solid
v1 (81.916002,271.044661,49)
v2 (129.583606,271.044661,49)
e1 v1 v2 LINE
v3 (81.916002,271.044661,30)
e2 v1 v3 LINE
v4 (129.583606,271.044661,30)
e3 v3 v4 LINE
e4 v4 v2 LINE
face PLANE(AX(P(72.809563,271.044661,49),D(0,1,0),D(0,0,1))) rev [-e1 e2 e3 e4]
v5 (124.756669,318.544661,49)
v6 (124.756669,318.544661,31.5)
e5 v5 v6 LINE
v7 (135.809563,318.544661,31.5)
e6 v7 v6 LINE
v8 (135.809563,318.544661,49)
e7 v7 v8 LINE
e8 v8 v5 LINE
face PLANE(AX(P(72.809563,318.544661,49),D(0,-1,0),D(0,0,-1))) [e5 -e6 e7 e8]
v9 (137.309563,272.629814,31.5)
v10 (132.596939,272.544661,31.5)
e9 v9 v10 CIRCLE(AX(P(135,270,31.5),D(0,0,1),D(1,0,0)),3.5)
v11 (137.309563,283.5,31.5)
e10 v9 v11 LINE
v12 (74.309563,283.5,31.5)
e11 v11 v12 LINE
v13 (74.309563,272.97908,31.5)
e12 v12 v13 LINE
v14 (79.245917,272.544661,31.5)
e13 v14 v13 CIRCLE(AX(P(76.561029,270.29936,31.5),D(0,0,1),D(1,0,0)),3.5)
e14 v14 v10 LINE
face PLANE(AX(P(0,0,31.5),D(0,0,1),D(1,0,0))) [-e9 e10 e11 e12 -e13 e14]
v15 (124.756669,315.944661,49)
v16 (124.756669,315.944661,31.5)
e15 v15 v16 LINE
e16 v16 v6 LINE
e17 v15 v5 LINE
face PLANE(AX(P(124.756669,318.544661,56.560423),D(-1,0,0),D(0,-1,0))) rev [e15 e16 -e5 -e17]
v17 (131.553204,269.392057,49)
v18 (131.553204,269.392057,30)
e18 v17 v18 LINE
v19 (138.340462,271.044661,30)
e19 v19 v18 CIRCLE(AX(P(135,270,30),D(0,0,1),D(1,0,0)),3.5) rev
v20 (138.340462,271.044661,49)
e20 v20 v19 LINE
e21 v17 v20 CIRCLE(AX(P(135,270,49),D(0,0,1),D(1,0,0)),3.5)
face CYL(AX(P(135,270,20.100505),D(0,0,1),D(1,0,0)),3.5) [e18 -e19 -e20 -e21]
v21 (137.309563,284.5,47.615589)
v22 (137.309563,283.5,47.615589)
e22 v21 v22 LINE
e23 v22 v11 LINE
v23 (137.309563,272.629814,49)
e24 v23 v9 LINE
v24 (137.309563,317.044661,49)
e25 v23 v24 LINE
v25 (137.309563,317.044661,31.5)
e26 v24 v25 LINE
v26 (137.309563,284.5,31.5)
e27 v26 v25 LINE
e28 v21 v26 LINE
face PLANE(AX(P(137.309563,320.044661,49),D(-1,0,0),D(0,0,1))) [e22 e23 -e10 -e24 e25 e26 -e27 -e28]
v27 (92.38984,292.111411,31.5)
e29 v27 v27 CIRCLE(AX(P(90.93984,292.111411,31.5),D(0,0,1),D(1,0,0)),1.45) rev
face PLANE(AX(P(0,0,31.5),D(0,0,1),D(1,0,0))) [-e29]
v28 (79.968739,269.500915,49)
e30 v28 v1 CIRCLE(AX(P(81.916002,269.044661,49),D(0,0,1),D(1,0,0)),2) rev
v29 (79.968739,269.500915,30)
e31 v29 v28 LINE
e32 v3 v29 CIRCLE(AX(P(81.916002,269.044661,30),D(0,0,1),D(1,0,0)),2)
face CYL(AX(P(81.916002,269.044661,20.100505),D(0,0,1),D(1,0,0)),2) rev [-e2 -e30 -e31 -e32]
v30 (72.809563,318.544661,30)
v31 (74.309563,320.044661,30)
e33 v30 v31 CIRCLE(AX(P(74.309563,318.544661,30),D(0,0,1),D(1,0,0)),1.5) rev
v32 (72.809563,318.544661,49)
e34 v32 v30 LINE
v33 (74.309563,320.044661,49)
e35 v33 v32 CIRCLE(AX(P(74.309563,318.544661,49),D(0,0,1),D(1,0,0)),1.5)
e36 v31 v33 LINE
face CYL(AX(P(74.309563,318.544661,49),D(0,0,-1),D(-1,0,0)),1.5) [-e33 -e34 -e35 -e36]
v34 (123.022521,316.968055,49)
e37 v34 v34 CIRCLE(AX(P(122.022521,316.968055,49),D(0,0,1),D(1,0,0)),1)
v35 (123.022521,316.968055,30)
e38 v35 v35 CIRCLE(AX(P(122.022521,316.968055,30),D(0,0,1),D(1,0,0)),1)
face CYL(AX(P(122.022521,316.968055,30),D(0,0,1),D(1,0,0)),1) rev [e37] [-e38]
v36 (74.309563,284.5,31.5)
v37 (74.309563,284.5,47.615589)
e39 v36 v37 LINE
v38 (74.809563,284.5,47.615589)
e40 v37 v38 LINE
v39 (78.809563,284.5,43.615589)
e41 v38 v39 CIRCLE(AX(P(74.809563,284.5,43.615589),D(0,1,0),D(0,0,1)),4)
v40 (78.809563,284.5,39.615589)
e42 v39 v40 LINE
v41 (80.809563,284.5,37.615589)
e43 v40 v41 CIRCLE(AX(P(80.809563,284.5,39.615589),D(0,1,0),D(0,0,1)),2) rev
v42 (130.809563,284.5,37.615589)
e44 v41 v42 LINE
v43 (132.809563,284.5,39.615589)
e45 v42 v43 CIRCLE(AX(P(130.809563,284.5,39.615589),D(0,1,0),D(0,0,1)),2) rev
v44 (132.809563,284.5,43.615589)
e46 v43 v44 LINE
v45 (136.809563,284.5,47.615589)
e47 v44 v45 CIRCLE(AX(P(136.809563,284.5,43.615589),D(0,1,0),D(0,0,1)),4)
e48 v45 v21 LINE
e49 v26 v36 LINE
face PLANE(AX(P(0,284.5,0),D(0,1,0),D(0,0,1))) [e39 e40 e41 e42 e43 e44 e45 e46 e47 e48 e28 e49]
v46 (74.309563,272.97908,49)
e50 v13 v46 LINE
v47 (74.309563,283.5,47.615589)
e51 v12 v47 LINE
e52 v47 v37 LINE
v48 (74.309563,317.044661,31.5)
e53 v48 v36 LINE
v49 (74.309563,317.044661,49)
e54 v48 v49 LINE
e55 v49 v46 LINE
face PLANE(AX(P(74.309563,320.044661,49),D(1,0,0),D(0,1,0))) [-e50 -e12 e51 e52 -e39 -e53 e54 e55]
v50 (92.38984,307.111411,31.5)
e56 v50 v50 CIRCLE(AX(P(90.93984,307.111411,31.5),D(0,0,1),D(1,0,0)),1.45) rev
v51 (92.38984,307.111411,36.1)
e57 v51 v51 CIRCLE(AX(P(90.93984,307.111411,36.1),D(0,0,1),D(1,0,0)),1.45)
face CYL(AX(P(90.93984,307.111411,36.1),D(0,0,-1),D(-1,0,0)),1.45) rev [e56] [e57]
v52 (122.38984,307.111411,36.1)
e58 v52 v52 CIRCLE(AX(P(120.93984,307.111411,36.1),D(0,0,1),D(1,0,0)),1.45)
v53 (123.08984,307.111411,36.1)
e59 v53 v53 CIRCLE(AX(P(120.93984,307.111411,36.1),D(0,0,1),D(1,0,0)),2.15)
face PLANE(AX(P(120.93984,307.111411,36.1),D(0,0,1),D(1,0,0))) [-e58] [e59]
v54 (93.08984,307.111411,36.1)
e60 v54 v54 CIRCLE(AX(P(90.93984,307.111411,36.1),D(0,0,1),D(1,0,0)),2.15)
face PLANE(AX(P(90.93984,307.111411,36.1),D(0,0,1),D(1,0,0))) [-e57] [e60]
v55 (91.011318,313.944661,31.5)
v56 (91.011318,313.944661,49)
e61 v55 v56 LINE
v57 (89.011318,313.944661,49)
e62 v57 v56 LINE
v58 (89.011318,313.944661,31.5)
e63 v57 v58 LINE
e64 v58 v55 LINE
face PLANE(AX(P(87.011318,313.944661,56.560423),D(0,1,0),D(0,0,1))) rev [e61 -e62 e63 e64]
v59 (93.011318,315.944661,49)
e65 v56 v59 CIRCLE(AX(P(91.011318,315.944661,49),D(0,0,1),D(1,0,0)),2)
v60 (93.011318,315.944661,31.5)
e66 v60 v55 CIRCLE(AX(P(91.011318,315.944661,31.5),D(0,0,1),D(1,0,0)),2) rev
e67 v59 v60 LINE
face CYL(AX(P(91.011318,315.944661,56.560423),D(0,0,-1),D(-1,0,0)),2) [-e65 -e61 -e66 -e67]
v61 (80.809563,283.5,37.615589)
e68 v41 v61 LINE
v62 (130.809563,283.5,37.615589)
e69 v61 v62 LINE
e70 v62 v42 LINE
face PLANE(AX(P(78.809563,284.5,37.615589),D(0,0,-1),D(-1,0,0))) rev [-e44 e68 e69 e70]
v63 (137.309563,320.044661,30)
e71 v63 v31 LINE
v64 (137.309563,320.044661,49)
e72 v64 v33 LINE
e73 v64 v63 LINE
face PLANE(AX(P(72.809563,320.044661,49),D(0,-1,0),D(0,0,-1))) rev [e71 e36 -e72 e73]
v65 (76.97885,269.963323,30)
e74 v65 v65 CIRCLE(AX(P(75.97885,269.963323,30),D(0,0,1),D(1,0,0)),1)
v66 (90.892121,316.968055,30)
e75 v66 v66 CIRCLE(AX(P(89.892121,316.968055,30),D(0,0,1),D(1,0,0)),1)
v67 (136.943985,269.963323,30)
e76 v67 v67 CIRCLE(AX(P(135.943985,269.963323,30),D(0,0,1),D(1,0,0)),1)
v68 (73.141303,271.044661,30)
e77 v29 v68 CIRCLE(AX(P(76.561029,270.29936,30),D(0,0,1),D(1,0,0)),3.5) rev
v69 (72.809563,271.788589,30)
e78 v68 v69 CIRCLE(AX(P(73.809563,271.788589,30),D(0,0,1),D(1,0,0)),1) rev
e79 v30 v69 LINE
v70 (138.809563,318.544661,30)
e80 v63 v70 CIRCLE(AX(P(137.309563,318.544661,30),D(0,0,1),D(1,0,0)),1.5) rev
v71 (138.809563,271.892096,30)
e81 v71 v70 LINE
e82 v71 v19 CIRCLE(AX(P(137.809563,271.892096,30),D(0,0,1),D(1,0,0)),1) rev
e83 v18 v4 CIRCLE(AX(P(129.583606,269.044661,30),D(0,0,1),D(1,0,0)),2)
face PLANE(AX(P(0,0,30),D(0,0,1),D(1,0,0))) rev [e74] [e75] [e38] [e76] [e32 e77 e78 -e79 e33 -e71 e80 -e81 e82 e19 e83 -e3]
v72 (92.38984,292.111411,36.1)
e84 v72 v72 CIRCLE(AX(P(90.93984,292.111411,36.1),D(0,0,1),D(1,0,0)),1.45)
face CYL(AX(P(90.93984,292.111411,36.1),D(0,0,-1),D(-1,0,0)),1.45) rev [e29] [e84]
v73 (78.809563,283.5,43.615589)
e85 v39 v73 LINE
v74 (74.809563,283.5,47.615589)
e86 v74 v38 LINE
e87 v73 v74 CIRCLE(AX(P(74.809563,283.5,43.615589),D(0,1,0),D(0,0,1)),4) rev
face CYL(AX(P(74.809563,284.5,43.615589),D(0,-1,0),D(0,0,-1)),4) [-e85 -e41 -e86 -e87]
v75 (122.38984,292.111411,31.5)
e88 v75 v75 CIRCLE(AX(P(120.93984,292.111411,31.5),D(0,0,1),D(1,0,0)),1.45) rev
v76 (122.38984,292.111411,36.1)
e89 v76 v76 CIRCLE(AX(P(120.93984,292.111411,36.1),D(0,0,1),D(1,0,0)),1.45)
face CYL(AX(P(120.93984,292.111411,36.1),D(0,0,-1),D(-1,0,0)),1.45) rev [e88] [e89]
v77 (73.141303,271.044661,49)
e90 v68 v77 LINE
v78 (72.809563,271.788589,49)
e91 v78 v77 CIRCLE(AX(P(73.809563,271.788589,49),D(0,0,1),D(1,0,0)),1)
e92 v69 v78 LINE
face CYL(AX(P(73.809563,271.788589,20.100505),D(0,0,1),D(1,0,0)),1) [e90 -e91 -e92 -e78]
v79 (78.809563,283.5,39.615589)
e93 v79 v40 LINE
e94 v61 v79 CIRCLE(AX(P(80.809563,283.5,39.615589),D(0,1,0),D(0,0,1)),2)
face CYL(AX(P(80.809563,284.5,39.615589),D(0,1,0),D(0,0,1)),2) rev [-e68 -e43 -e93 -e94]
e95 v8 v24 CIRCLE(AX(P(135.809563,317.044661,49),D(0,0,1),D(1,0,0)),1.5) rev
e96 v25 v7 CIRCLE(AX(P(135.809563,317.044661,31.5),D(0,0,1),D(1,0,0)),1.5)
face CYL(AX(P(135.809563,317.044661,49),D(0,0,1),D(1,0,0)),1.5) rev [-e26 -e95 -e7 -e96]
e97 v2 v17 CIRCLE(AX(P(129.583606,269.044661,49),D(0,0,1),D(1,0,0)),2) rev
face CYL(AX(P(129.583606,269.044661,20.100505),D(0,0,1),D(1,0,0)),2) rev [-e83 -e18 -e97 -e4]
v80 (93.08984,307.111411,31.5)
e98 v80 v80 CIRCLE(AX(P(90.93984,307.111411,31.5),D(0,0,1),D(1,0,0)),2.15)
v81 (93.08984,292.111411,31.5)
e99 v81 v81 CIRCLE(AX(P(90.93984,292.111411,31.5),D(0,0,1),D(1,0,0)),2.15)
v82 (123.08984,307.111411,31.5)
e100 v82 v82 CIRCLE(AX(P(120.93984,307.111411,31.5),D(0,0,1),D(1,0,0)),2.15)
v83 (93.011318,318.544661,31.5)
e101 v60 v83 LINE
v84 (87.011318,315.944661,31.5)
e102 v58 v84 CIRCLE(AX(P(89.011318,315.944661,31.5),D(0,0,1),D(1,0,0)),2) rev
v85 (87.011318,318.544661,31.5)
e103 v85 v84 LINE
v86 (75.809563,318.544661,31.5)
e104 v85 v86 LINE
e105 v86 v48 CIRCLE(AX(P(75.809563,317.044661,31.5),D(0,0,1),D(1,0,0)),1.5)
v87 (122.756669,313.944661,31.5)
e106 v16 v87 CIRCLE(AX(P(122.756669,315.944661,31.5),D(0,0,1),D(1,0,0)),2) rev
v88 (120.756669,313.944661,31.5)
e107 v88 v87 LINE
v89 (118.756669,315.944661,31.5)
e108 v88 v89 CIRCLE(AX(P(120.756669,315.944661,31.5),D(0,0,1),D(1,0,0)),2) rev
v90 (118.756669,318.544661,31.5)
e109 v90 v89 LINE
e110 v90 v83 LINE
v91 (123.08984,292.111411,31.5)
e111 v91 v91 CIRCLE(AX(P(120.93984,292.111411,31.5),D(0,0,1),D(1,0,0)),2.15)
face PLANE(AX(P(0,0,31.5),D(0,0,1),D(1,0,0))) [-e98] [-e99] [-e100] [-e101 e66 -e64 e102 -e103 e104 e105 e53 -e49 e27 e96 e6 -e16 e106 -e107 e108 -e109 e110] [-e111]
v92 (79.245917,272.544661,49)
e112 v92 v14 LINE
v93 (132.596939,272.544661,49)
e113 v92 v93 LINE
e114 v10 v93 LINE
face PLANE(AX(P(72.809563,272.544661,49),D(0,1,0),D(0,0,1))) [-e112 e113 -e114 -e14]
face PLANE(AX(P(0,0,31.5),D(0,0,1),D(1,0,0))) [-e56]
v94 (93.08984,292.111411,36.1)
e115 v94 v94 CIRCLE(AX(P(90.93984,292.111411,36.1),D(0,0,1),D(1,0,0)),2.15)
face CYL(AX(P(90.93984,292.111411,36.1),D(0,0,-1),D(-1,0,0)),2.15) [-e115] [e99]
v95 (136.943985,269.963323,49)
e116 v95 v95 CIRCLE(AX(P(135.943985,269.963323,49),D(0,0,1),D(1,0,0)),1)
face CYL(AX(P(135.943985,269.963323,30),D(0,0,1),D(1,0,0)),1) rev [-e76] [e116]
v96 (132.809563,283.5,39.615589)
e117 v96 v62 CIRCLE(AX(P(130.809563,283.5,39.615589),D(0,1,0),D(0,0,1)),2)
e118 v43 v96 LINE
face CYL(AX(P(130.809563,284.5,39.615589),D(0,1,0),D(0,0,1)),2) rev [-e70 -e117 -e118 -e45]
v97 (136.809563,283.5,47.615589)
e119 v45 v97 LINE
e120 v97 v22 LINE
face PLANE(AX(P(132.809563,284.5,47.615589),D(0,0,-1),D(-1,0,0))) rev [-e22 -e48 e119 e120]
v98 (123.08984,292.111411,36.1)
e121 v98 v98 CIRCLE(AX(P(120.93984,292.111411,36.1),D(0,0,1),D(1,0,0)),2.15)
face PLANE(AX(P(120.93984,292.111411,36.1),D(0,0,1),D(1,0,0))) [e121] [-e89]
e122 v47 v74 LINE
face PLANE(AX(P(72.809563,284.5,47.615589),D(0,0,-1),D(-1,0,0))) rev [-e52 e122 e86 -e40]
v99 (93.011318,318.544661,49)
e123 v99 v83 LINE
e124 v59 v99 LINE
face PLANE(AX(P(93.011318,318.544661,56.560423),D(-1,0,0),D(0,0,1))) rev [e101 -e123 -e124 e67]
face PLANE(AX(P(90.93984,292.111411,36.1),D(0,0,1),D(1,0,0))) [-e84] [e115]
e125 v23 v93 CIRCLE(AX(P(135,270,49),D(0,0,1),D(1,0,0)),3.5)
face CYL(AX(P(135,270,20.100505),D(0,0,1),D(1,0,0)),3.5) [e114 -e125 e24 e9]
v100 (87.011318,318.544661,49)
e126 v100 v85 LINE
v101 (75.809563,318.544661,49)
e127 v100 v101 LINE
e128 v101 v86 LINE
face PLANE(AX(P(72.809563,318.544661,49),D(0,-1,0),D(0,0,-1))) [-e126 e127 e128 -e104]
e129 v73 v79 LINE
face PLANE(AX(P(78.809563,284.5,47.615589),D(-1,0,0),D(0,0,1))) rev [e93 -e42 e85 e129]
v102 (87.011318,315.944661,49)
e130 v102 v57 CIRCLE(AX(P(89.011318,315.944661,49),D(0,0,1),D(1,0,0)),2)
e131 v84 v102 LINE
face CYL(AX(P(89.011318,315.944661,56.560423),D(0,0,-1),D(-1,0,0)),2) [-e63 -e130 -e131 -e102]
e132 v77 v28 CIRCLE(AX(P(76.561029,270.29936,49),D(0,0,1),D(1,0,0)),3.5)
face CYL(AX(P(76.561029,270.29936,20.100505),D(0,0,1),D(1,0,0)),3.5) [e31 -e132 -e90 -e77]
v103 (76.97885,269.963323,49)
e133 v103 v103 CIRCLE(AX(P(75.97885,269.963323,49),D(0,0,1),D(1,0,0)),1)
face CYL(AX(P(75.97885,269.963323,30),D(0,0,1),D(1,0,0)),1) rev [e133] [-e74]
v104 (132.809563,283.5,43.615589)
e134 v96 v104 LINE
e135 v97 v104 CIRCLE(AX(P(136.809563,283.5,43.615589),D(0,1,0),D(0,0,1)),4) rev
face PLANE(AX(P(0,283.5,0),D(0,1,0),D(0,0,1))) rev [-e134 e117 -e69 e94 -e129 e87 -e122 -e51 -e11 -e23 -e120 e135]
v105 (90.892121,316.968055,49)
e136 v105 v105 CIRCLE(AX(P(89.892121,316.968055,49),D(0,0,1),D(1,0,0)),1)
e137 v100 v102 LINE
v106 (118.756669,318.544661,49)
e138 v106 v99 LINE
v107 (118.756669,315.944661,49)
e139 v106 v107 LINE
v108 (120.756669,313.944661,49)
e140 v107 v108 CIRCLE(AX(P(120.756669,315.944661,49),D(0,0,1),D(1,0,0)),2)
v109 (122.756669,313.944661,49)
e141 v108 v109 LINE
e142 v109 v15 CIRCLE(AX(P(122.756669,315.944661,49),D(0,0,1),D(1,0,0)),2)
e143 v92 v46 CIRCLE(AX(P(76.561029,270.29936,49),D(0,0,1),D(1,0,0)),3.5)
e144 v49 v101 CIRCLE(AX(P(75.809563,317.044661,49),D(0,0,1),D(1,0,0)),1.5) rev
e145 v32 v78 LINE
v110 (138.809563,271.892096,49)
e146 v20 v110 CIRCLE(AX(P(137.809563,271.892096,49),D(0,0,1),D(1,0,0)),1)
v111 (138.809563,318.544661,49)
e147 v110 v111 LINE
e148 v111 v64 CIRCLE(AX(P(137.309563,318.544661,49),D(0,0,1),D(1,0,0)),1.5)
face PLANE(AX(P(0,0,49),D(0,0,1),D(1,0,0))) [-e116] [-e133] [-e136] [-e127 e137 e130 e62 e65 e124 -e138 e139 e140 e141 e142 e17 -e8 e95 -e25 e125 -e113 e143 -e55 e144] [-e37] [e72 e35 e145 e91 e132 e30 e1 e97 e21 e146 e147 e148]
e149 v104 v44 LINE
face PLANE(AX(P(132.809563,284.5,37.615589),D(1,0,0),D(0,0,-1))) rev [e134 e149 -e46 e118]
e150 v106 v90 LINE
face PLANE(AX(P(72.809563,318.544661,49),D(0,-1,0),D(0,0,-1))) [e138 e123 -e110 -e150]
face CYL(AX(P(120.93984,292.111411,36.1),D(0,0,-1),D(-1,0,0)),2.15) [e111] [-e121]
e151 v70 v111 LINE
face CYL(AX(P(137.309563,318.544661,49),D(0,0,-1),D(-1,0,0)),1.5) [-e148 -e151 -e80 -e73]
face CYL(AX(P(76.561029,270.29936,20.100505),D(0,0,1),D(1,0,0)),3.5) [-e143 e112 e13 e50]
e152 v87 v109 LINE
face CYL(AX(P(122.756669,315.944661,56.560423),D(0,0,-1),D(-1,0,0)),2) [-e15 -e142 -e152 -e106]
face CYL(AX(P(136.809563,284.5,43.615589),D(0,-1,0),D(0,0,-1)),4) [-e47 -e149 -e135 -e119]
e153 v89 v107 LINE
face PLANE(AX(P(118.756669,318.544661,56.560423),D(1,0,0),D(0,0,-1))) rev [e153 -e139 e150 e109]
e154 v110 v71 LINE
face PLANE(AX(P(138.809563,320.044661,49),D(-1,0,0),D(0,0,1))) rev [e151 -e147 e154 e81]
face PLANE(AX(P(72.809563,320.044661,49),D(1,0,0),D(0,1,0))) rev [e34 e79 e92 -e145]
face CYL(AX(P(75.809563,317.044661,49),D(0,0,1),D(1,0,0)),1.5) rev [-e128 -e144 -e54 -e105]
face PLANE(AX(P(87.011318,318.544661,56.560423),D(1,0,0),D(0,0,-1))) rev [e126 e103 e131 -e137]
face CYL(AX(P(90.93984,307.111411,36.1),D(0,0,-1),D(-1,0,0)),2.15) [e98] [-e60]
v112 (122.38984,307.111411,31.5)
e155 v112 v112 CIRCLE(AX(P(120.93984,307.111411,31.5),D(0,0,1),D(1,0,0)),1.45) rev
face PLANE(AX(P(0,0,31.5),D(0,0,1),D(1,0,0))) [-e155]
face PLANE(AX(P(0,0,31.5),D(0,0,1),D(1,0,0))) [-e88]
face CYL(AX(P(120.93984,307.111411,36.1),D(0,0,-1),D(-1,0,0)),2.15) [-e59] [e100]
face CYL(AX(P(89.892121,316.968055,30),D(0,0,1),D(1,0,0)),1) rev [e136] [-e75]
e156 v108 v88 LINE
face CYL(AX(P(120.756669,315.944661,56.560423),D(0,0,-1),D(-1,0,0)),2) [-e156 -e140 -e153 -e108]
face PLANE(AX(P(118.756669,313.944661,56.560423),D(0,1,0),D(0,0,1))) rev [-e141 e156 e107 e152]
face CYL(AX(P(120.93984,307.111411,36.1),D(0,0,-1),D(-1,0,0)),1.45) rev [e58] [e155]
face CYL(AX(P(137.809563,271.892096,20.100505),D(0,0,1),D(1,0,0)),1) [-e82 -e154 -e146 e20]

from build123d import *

# Parameters (mm, degrees)
SKETCH1_W           = 66
SKETCH1_H           = 49
BOSS_EXTRUDE1_DEPTH = 19
SHELL1_T            = -1.5
SKETCH2_W           = 6
SKETCH2_H           = 4.6
BOSS_EXTRUDE2_DEPTH = 17.5
FILLET1_R           = 1.5
SKETCH3_R           = 2.15
SKETCH3_R_2         = 1.45
BOSS_EXTRUDE3_DEPTH = 4.6
BOSS_EXTRUDE4_DEPTH = 0.5
FILLET2_R           = 4
FILLET3_R           = 2
BOSS_EXTRUDE5_REACH = 351.368
SKETCH5_R           = 3.5
FILLET4_R           = 2
SKETCH6_R           = 1
CUT_EXTRUDE1_DEPTH  = 350.367542449
FILLET5_R           = 1


with BuildPart() as part:
    # Sketch1 → Boss-Extrude1 (new body)
    with BuildSketch(Plane.XY.offset(30)):
        with Locations((105.809562907, 295.544660887)):
            Rectangle(SKETCH1_W, SKETCH1_H)
    extrude(amount=BOSS_EXTRUDE1_DEPTH)

    # Shell1
    shell1_openings = [part.faces().sort_by_distance(p)[0] for p in [
        (105.809562907, 295.544660887, 49),
    ]]
    offset(amount=SHELL1_T, openings=shell1_openings, kind=Kind.INTERSECTION)

    # Sketch2 → Boss-Extrude2 (add)
    with BuildSketch(Plane.XY.offset(31.5)):
        with Locations((90.011318394, 316.244660887)):
            Rectangle(SKETCH2_W, SKETCH2_H)
        with Locations((121.756668801, 316.244660887)):
            Rectangle(SKETCH2_W, SKETCH2_H)
    extrude(amount=BOSS_EXTRUDE2_DEPTH)

    # Fillet1
    fillet1_edges = [part.edges().sort_by_distance(p)[0] for p in [
        (74.309562907, 318.544660887, 40.25),
        (137.309562907, 318.544660887, 40.25),
        (72.809562907, 320.044660887, 39.5),
        (138.809562907, 320.044660887, 39.5),
    ]]
    fillet(fillet1_edges, radius=FILLET1_R)

    # Sketch3 → Boss-Extrude3 (add)
    # profile 1 of 4: a face of its own
    with BuildSketch(Plane.XY.offset(31.5)):
        with Locations((90.939840403, 307.111410879)):
            Circle(SKETCH3_R)
        with Locations((90.939840403, 307.111410879)):
            Circle(SKETCH3_R_2, mode=Mode.SUBTRACT)
    # profile 2 of 4: a face of its own
    with BuildSketch(Plane.XY.offset(31.5)):
        with Locations((120.939840403, 307.111410879)):
            Circle(SKETCH3_R)
        with Locations((120.939840403, 307.111410879)):
            Circle(SKETCH3_R_2, mode=Mode.SUBTRACT)
    # profile 3 of 4: a face of its own
    with BuildSketch(Plane.XY.offset(31.5)):
        with Locations((120.939840403, 292.111410879)):
            Circle(SKETCH3_R)
        with Locations((120.939840403, 292.111410879)):
            Circle(SKETCH3_R_2, mode=Mode.SUBTRACT)
    # profile 4 of 4: a face of its own
    with BuildSketch(Plane.XY.offset(31.5)):
        with Locations((90.939840403, 292.111410879)):
            Circle(SKETCH3_R)
        with Locations((90.939840403, 292.111410879)):
            Circle(SKETCH3_R_2, mode=Mode.SUBTRACT)
    extrude(amount=BOSS_EXTRUDE3_DEPTH)

    # Sketch4 → Boss-Extrude4 (add, symmetric)
    with BuildSketch(Plane(origin=(0, 284, 0), x_dir=(1, 0, 0), z_dir=(0, 1, 0))):
        Polygon((72.809562907, -47.615589413), (78.809562907, -47.615589413), (78.809562907, -37.615589413), (132.809562907, -37.615589413), (132.809562907, -47.615589413), (138.809562907, -47.615589413), (138.809562907, -30), (72.809562907, -30), align=None)
    extrude(amount=BOSS_EXTRUDE4_DEPTH, both=True)

    # Fillet2
    fillet2_edges = [part.edges().sort_by_distance(p)[0] for p in [
        (78.809562907, 284, 47.615589413),
        (132.809562907, 284, 47.615589413),
    ]]
    fillet(fillet2_edges, radius=FILLET2_R)

    # Fillet3
    fillet3_edges = [part.edges().sort_by_distance(p)[0] for p in [
        (78.809562907, 284, 37.615589413),
        (132.809562907, 284, 37.615589413),
    ]]
    fillet(fillet3_edges, radius=FILLET3_R)

    # Boss-Extrude5: up to this face of the body (flat: up to its plane)
    boss_extrude5_end = Plane(part.part.faces().sort_by_distance((105.809562907, 295.537442811, 30))[0])
    # Sketch5 → Boss-Extrude5 (add, up to the picked face)
    with BuildSketch(Plane.XY.offset(49), mode=Mode.PRIVATE) as boss_extrude5_sk1:
        with Locations((76.56102911, 270.299359986)):
            Circle(SKETCH5_R)
    boss_extrude5_tool1 = split(extrude(boss_extrude5_sk1.sketch, amount=-BOSS_EXTRUDE5_REACH, mode=Mode.PRIVATE), bisect_by=boss_extrude5_end, keep=Keep.BOTH, mode=Mode.PRIVATE)
    # Sketch5 → Boss-Extrude5 (add, up to the picked face)
    with BuildSketch(Plane.XY.offset(49), mode=Mode.PRIVATE) as boss_extrude5_sk2:
        with Locations((135, 270)):
            Circle(SKETCH5_R)
    boss_extrude5_tool2 = split(extrude(boss_extrude5_sk2.sketch, amount=-BOSS_EXTRUDE5_REACH, mode=Mode.PRIVATE), bisect_by=boss_extrude5_end, keep=Keep.BOTH, mode=Mode.PRIVATE)
    add(boss_extrude5_tool1.solids().sort_by(Axis((76.561029, 270.29936, 49), (0, 0, -1)))[0])
    add(boss_extrude5_tool2.solids().sort_by(Axis((135, 270, 49), (0, 0, -1)))[0])

    # Fillet4
    fillet4_edges = [part.edges().sort_by_distance(p)[0] for p in [
        (79.980755206, 271.044660887, 39.5),
        (131.659538411, 271.044660887, 39.5),
        (87.011318394, 313.944660887, 40.25),
        (93.011318394, 313.944660887, 40.25),
        (118.756668801, 313.944660887, 40.25),
        (124.756668801, 313.944660887, 40.25),
    ]]
    fillet(fillet4_edges, radius=FILLET4_R)

    # Sketch6 → Cut-Extrude1 (cut, through all)
    with BuildSketch(Plane.XY.offset(49)):
        with Locations((89.892121314, 316.968054702)):
            Circle(SKETCH6_R)
        with Locations((122.022521406, 316.968054702)):
            Circle(SKETCH6_R)
        with Locations((75.978849521, 269.963322555)):
            Circle(SKETCH6_R)
        with Locations((135.943985107, 269.963322555)):
            Circle(SKETCH6_R)
    extrude(amount=-CUT_EXTRUDE1_DEPTH, mode=Mode.SUBTRACT)

    # Fillet5
    # the kernel refuses this fillet: 1 mm, written as the material it takes off along each edge
    with BuildSketch(Plane(origin=(72.809562907, 271.044660887, 28.140180255), x_dir=(1, 0, 0), z_dir=(0, 0, 1))) as fillet5_piece_1:
        with BuildLine():
            CenterArc((1, 0.743927898), FILLET5_R, 180, 48.067095939)
            Line((0, 0.743927898), (-0.02, 0.743927898))
            Line((-0.02, 0.743927898), (-0.02, 0))
            Line((-0.02, 0), (0, -0.02))
            ThreePointArc((0, -0.02), (0.165870054, -0.02), (0.31837491, -0.014878558))
            Line((0.31837491, -0.014878558), (0.331740108, 0))
        make_face()
    extrude(amount=22.719639489, mode=Mode.SUBTRACT)
    with BuildSketch(Plane(origin=(138.809562907, 271.044660887, 27.881411748), x_dir=(-1, 0, 0), z_dir=(0, 0, 1))) as fillet5_piece_2:
        with BuildLine():
            CenterArc((1, -0.847435301), FILLET5_R, 122.066195324, 57.933804676)
            Line((0, -0.847435301), (-0.02, -0.847435301))
            Line((-0.02, -0.847435301), (-0.02, 0))
            Line((-0.02, 0), (0, 0.02))
            ThreePointArc((0, 0.02), (0.234550659, 0.02), (0.458483344, 0.016948706))
            Line((0.458483344, 0.016948706), (0.469101317, 0))
        make_face()
    extrude(amount=23.237176503, mode=Mode.SUBTRACT)


solid = part.part
